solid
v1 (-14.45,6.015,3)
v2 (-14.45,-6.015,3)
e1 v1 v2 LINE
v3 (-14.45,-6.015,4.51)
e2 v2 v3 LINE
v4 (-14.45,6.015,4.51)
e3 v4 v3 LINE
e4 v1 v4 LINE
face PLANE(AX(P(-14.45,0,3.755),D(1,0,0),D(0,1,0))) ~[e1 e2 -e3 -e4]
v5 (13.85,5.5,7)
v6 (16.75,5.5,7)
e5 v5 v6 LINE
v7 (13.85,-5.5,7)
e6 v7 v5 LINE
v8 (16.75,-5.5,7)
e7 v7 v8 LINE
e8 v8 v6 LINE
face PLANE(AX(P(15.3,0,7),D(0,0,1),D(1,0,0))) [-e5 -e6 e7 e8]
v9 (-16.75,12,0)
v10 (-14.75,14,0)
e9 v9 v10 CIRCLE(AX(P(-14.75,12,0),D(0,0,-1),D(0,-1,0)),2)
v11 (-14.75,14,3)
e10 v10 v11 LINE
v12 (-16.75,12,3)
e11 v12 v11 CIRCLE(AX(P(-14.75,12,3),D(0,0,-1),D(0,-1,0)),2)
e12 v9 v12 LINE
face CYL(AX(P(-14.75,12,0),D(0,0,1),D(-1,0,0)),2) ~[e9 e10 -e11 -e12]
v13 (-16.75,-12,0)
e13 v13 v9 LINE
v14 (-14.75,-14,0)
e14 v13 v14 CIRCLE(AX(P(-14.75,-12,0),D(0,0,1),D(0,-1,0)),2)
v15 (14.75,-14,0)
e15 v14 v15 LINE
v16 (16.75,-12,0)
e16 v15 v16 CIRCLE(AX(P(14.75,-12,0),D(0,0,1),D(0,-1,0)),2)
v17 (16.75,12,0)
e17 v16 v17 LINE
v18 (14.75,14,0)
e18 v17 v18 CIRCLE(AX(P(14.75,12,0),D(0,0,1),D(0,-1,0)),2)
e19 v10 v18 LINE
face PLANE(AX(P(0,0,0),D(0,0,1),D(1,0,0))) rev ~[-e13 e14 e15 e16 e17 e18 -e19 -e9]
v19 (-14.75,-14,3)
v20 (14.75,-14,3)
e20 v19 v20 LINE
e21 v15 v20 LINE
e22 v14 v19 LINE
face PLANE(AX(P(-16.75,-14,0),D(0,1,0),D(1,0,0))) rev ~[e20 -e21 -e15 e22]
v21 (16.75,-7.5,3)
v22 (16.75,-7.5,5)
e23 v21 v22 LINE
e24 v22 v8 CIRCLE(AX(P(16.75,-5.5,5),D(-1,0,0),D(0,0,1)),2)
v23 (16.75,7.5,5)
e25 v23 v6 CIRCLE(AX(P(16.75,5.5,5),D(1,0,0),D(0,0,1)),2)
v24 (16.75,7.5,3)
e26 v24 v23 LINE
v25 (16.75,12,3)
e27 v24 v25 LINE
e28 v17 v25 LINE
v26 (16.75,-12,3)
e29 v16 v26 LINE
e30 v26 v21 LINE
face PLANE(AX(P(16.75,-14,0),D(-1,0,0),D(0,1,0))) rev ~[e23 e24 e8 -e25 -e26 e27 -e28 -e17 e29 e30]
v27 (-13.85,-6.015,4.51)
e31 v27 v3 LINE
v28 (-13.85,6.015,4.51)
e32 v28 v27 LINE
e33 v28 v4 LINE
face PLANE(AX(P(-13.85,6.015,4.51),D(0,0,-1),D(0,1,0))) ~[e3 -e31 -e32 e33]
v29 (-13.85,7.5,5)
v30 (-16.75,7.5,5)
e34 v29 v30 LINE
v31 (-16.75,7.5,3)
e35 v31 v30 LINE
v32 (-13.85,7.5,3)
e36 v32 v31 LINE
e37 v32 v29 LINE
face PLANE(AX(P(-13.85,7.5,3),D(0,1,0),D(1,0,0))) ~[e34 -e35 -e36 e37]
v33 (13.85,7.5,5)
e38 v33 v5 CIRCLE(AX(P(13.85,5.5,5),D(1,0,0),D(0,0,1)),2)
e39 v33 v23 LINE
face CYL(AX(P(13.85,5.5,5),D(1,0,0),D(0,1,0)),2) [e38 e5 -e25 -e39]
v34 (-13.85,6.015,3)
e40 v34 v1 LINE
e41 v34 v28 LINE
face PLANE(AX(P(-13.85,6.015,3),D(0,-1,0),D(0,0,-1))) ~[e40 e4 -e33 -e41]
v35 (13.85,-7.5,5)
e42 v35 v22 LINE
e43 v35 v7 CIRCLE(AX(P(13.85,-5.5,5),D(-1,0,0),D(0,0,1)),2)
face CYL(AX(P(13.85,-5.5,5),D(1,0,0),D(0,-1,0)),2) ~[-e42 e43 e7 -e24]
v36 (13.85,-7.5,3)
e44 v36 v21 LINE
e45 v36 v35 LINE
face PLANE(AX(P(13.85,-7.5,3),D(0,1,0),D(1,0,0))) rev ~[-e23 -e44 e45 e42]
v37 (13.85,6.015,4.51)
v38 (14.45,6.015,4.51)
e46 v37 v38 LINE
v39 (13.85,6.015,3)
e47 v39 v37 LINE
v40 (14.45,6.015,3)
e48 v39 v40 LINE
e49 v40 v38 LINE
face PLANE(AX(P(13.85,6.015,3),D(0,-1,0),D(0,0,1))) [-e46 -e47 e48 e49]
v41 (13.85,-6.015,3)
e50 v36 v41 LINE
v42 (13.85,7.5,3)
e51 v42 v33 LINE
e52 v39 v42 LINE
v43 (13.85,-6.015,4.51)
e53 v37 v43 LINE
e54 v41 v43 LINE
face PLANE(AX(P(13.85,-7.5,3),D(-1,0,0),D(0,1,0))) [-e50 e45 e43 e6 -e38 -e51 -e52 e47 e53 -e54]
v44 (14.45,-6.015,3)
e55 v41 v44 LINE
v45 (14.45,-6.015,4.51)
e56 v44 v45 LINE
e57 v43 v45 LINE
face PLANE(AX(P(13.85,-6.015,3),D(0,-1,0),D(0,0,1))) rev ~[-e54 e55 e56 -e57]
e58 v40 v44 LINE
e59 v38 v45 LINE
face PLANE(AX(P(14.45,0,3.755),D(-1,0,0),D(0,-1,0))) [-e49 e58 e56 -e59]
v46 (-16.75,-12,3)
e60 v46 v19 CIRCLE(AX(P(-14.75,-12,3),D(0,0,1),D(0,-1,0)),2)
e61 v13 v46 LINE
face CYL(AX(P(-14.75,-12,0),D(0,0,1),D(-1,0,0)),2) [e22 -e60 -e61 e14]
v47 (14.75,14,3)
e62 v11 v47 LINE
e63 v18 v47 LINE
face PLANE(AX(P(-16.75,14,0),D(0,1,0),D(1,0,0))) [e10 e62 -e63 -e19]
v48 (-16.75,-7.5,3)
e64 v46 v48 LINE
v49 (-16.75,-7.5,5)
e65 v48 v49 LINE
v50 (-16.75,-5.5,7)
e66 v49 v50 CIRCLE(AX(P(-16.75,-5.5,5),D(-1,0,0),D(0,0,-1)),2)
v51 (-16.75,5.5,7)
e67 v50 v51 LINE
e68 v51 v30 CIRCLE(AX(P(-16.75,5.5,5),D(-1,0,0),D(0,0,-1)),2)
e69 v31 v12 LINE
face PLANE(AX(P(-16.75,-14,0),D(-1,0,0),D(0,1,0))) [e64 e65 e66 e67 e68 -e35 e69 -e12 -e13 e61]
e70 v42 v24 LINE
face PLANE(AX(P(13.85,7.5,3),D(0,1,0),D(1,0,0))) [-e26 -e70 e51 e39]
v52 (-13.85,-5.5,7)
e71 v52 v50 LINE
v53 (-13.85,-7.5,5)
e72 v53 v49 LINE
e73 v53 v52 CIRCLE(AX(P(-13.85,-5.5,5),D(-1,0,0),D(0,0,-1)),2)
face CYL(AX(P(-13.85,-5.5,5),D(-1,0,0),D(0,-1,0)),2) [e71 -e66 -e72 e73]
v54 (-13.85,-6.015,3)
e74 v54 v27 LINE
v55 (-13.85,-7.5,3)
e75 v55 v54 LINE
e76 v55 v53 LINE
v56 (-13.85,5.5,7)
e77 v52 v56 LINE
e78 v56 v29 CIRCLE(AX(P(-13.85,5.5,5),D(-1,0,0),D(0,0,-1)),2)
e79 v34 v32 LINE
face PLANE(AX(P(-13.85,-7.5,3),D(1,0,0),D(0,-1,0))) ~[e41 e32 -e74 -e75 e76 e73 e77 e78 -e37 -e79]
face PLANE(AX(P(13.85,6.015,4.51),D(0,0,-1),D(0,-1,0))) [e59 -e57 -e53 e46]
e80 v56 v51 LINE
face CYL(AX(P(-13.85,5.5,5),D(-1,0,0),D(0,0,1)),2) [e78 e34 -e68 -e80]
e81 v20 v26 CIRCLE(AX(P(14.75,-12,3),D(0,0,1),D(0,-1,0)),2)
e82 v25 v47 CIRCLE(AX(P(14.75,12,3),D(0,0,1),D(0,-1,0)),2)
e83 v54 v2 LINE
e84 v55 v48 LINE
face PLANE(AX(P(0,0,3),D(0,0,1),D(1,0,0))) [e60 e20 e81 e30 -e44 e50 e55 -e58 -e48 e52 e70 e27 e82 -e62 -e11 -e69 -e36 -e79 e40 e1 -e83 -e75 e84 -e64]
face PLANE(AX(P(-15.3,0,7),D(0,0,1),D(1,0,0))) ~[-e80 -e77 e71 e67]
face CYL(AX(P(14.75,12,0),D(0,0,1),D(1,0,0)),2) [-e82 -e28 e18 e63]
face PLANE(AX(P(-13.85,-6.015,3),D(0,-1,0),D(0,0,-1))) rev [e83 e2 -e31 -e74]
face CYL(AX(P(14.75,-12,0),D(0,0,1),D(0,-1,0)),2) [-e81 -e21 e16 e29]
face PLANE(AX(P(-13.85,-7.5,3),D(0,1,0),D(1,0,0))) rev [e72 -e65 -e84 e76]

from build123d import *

# Parameters (mm, degrees)
F0_W     = 33.5
F0_H     = 28
F1_DEPTH = 3
F2_R     = 2
F3_W     = 2.9
F3_H     = 15
F4_DEPTH = 4
F5_W     = 12.03
F5_H     = 1.51
F6_DEPTH = 0.6
F7_R     = 2


# Not quite as in the source:
# - a pattern or mirror of a feature is missing from the dataset's text; its kind, count and spacing are read off the source's solid


with BuildPart() as f1:
    # F0 (on Top) → F1 (new body)
    with BuildSketch(Plane.XY):
        Rectangle(F0_W, F0_H)
    extrude(amount=F1_DEPTH)

    # F2
    f2_edges = [f1.edges().sort_by_distance(p)[0] for p in [
        (-16.75, -14, 1.5),
        (16.75, -14, 1.5),
        (16.75, 14, 1.5),
        (-16.75, 14, 1.5),
    ]]
    fillet(f2_edges, radius=F2_R)

    # F3 (on face) → F4 (join)
    with BuildSketch(Plane.XY.offset(3)):
        with Locations((15.3, 0)):
            Rectangle(F3_W, F3_H)
    f4 = extrude(amount=F4_DEPTH)

    # F4_copies: F4 across plane
    add(f4.mirror(Plane(origin=(0, 0, 0), x_dir=(0, 0, -1), z_dir=(-1, 0, 0))))

    # F5 (on face) → F6 (cut)
    with BuildSketch(Plane(origin=(13.85, 0, 0), x_dir=(0, -1, 0), z_dir=(-1, 0, 0))):
        with Locations((0, 3.755)):
            Rectangle(F5_W, F5_H)
    f6 = extrude(amount=-F6_DEPTH, mode=Mode.SUBTRACT)

    # F6_copies: F6 across plane
    add(f6.mirror(Plane(origin=(0, 0, 0), x_dir=(0, 0, -1), z_dir=(-1, 0, 0))), mode=Mode.SUBTRACT)

    # F7
    f7_edges = [f1.edges().sort_by_distance(p)[0] for p in [
        (15.3, 7.5, 7),
        (15.3, -7.5, 7),
        (-15.3, 7.5, 7),
        (-15.3, -7.5, 7),
    ]]
    fillet(f7_edges, radius=F7_R)


solid = f1.part
